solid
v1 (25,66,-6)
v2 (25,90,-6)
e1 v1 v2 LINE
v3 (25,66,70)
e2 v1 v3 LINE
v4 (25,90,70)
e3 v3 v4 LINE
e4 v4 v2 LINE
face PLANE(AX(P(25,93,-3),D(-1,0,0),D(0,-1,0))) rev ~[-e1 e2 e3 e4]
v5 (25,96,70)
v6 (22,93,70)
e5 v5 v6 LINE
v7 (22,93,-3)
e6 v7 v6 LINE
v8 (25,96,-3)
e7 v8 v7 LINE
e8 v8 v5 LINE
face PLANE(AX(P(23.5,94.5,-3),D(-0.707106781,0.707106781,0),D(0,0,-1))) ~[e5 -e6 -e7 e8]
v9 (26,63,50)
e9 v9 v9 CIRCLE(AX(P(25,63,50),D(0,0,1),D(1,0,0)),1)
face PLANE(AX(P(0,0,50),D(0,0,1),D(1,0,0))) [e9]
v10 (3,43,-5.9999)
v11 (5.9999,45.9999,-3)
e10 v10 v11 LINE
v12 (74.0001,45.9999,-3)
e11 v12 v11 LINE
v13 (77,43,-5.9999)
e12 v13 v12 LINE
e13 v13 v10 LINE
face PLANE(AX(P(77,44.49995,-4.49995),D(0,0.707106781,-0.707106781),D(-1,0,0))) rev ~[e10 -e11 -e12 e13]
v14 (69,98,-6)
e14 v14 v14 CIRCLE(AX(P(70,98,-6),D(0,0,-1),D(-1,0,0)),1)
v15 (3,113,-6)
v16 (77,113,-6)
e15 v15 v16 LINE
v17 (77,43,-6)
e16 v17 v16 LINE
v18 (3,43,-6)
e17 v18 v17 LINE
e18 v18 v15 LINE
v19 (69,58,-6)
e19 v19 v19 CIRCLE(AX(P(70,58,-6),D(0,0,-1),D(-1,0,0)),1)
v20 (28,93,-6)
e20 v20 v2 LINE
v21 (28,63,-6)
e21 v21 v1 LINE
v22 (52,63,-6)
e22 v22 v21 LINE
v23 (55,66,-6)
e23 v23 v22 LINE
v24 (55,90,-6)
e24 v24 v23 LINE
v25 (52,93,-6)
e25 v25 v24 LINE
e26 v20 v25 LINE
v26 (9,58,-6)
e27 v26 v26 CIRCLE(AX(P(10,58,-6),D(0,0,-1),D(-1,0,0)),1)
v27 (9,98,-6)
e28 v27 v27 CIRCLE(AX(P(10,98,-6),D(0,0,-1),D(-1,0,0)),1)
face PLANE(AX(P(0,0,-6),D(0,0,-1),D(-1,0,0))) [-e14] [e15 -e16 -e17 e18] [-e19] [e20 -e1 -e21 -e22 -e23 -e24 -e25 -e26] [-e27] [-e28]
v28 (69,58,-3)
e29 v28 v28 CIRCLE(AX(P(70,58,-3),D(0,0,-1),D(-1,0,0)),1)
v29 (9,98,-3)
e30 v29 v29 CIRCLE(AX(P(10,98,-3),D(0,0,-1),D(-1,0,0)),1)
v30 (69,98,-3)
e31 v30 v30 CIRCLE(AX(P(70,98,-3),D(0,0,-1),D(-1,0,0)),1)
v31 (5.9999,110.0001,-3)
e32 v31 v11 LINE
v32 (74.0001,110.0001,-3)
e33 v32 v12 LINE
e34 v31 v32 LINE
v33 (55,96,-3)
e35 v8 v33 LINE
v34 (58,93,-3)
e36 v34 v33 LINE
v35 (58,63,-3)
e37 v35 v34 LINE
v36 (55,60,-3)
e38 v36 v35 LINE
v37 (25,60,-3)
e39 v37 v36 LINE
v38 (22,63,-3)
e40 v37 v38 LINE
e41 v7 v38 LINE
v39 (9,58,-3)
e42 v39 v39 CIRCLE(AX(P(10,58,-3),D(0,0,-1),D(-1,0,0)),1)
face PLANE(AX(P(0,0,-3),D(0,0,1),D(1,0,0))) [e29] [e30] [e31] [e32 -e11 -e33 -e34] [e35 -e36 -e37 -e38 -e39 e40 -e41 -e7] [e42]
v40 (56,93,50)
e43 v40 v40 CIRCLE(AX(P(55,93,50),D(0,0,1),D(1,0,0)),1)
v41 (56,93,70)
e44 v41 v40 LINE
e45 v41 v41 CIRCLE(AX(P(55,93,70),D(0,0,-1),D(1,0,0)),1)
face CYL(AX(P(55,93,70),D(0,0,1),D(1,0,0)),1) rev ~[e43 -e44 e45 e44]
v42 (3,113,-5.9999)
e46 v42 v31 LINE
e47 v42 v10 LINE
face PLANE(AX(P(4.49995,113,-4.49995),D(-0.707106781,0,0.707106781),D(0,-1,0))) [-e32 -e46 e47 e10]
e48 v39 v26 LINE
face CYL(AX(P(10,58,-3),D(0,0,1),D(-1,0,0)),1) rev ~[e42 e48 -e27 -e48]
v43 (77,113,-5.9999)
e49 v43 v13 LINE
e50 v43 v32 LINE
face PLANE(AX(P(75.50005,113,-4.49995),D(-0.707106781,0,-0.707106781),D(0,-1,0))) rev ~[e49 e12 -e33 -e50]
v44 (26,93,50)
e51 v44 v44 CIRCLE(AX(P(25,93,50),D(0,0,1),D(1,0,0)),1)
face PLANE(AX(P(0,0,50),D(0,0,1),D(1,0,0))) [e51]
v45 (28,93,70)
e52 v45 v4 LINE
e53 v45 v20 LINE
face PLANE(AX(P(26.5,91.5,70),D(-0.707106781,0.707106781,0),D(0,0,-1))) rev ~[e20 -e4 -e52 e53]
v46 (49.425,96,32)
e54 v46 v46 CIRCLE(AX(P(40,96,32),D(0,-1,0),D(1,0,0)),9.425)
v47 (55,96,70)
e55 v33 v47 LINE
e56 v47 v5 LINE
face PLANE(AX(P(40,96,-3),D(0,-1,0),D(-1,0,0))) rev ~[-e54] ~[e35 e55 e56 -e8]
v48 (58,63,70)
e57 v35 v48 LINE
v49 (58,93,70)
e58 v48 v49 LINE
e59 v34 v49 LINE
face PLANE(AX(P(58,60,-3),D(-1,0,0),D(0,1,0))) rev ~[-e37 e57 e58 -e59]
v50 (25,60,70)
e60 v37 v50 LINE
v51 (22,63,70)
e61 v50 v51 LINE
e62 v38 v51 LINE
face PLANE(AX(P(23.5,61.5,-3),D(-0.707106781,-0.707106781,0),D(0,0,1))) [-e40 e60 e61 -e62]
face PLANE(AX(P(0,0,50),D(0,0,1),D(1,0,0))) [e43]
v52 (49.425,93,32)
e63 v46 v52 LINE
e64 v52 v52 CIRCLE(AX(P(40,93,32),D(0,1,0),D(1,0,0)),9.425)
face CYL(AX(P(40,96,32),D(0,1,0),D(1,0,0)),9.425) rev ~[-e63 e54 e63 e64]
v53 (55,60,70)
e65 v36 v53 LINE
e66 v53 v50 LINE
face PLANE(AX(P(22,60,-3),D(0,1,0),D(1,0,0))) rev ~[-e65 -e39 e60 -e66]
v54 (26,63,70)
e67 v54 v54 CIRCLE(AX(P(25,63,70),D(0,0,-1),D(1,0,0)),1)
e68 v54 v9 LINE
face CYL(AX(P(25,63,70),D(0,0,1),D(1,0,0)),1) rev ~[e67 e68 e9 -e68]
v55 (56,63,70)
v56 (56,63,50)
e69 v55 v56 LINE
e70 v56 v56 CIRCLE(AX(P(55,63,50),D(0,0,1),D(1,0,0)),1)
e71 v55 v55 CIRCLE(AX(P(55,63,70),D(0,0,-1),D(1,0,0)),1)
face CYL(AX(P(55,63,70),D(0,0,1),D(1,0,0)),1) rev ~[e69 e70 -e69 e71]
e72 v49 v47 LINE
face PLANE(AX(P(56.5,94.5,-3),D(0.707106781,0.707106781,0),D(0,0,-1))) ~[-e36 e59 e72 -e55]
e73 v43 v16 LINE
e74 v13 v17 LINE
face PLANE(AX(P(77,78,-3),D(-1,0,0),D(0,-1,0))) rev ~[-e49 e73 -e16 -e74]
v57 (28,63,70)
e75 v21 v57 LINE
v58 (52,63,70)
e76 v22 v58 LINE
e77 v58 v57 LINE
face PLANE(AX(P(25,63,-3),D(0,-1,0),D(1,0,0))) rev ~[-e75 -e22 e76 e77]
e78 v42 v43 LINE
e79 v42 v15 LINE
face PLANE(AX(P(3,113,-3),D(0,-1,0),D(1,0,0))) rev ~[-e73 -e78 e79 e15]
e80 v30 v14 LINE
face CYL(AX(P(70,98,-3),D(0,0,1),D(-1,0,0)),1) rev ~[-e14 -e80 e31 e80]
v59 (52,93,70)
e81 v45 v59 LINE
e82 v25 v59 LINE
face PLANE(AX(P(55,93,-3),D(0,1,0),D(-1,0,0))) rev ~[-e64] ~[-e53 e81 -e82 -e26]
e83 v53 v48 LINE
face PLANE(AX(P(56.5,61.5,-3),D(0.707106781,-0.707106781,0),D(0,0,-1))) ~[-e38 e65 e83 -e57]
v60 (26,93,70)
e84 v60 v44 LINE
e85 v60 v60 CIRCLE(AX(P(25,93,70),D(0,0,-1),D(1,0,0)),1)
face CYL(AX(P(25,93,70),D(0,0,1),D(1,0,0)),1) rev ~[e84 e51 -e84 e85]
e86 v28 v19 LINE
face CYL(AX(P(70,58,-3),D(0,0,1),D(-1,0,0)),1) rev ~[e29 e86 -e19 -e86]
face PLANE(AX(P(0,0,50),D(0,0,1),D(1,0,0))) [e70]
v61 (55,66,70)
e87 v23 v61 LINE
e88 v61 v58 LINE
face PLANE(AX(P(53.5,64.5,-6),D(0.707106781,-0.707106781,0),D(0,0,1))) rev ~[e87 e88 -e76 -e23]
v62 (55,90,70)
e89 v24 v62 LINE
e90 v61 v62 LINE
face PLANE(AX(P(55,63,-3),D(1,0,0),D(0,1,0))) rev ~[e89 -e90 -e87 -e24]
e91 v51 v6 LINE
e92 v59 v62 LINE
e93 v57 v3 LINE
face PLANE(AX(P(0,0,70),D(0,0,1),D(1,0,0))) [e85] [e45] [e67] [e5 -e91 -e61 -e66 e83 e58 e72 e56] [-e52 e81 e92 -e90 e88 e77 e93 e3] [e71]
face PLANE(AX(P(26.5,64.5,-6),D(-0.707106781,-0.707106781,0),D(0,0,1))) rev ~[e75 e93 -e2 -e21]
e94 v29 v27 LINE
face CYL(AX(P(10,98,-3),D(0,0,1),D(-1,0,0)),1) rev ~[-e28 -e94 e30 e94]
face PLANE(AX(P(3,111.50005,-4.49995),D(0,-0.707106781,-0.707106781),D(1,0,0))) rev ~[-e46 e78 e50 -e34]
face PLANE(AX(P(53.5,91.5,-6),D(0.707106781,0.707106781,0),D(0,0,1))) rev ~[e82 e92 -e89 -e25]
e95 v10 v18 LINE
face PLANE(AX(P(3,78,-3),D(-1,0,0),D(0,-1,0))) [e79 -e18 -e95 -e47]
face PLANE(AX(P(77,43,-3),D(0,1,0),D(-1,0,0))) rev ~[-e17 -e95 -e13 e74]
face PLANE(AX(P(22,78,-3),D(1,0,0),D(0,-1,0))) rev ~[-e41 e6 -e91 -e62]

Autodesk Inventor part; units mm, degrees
ref_plane "YZ Plane" through (0, 0, 0) normal (1, 0, 0) x (0, 1, 0)
ref_plane "XZ Plane" through (0, 0, 0) normal (0, 1, 0) x (-1, 0, 0)
ref_plane "XY Plane" through (0, 0, 0) normal (0, 0, 1) x (1, 0, 0)
sketch "Sketch1" plane through (0, 0, 0) normal (0, 0, 1) x (1, 0, 0)
  line L0 (0, 0) -> (80, 0)
  line L1 (80, 0) -> (80, 125.359)
  line L2 (60, 200) -> (80, 125.359)
  line L3 (60, 200) -> (137.2741, 200) construction
  line L4 (0, 0) -> (0, 125.359)
  line L5 (20, 200) -> (0, 125.359)
  line L6 (84, 125.8856) -> (84, -4)
  line L7 (84, -4) -> (-4, -4)
  line L8 (-4, -4) -> (-4, 125.8856)
  line L9 (-4, 125.8856) -> (16.9307, 204)
  line L10 (63.0693, 204) -> (84, 125.8856)
  line L11 (20, 204) -> (20, 200)
  line L12 (60, 200) -> (60, 204)
  line L13 (16.9307, 204) -> (20, 204)
  line L14 (60, 204) -> (63.0693, 204)
  point P0 (40, 0)
  dimension "d0" = 80
  dimension "d4" = 75
  dimension "d5" = 4
extrude "Extrusion1" add sketch "Sketch1" along normal blind 70
sketch "Sketch2" plane through (0, 0, 0) normal (0, 0, -1) x (-1, 0, 0)
  line L0 (-16.9307, 204) -> (4, 125.8856) projected
  line L1 (-84, 125.8856) -> (-63.0693, 204) projected
  line L2 (-16.9307, 204) -> (-63.0693, 204)
  line L3 (-80, 125.359) -> (-80, 0) projected
  line L4 (-60, 200) -> (-80, 125.359) projected
  line L5 (-60, 204) -> (-60, 200) projected
  line L6 (-63.0693, 204) -> (-60, 204) projected
  line L7 (-84, 125.8856) -> (-63.0693, 204) projected
  line L8 (-84, -4) -> (-84, 125.8856) projected
  line L9 (4, -4) -> (-84, -4) projected
  line L10 (4, 125.8856) -> (4, -4) projected
  line L11 (-16.9307, 204) -> (4, 125.8856) projected
  line L12 (-20, 204) -> (-16.9307, 204) projected
  line L13 (-20, 200) -> (-20, 204) projected
  line L14 (0, 125.359) -> (-20, 200) projected
  line L15 (0, 0) -> (0, 125.359) projected
  line L16 (-80, 0) -> (0, 0) projected
extrude "Extrusion2" add sketch "Sketch2" along normal blind 3
chamfer "Chamfer1" distance 5 angle 45 5 edges at (40, -4, -3) (84, 60.9428, -3) (-4, 60.9428, -3) (6.4653, 164.9428, -3) (73.5347, 164.9428, -3)
chamfer "Chamfer2" distance 3 angle 45 7 edges at (20, 202, 0) (10, 162.6795, 0) (60, 202, 0) (70, 162.6795, 0) (80, 62.6795, 0) (0, 62.6795, 0) (40, 0, 0)
chamfer "Chamfer3" distance 3 angle 45 4 edges at (84, -4, 36) (-4, -4, 36) (0, 0, 36.5) (80, 0, 36.5)
sketch "Sketch3" plane through (0, 0, 70) normal (0, 0, 1) x (1, 0, 0)
  line L0 (77, 0) -> (78.5, 1.5) projected
  line L1 (81, -4) -> (82.5, -2.5) projected
  line L2 (78.5, 1.5) -> (82.5, -2.5)
  line L3 (79, 1) -> (82.5, -2.5) projected
  circle A0 centre (80.75, -0.75) radius 1
  line L4 (-4, -1) -> (-2.5, -2.5) projected
  line L5 (-2.5, -2.5) -> (1.5, 1.5)
  line L6 (0, 3) -> (3, 0) projected
  line L7 (1, 1) -> (-2.5, -2.5) projected
  circle A1 centre (-0.75, -0.75) radius 1
  line L8 (3, 124.964) -> (0, 125.359) projected
  line L9 (16.9307, 204) -> (-4, 125.8856) projected
  line L10 (80, 125.359) -> (77, 124.964) projected
  line L11 (84, -1) -> (84, 125.8856) projected
  line L12 (1, 125.2273) -> (-4, 125.8856) projected
  circle A2 centre (82, 125.6223) radius 1
  circle A3 centre (-2, 125.6223) radius 1
  point P0 (0, 0)
  dimension "d19" = 2
  dimension "d20" = 2
  dimension "d22" = 2
  dimension "d23" = 2
extrude "Extrusion3" cut sketch "Sketch3" against normal blind 5
sketch "Sketch4" plane through (22.1071, 204, -3) normal (0, 1, 0) x (1, 0, 0)
  line L0 (35.7859, 0) -> (40.9622, -5) projected
  line L1 (38.374, -2.5) -> (36.3929, -4.5)
  line L2 (34.8929, -3) -> (37.8929, -6) projected
  circle A0 centre (37.3835, -3.5) radius 1
  line L3 (-21.1071, 0) -> (56.8929, 0) projected
  line L4 (17.8929, 0) -> (17.8929, -26)
  circle A1 centre (-1.5976, -3.5) radius 1
  point P0 (-22.1071, -3)
  dimension "d26" = 2
extrude "Extrusion4" cut sketch "Sketch4" against normal blind 15
sketch "Sketch5" plane through (0, 0, 0) normal (0, 0, 1) x (1, 0, 0)
  line L0 (77, 3) -> (3, 3) projected
  line L1 (40, 3) -> (40, 43)
  line L2 (40, 43) -> (40, 113)
  line L3 (40, 78) -> (20, 78)
  line L4 (20, 78) -> (20, 55.5)
  line L5 (20, 55.5) -> (60, 55.5)
  line L6 (60, 55.5) -> (60, 100.5)
  line L7 (60, 100.5) -> (20, 100.5)
  line L8 (20, 100.5) -> (20, 78)
  line L9 (40, 78) -> (70, 78)
  line L10 (70, 78) -> (70, 98)
  circle A0 centre (70, 98) radius 1
  line L11 (70, 78) -> (70, 58)
  circle A1 centre (70, 58) radius 1
  circle A2 centre (10, 98) radius 1
  circle A3 centre (10, 58) radius 1
  line L12 (40, 113) -> (40, 133)
  line L13 (40, 133) -> (63.1521, 133)
  line L14 (63.1521, 133) -> (63.1521, 155.7076)
  circle A4 centre (63.1521, 155.7076) radius 1.5
  circle A5 centre (63.1521, 133) radius 1.5
  circle A6 centre (16.8479, 155.7076) radius 1.5
  circle A7 centre (16.8479, 133) radius 1.5
  point P0 (0, 0)
  dimension "d29" = 40
  dimension "d30" = 70
  dimension "d31" = 20
  dimension "d32" = 22.5
  dimension "d33" = 40
  dimension "d34" = 45
  dimension "d35" = 30
  dimension "d36" = 20
  dimension "d37" = 2
  dimension "d38" = 20
  dimension "d39" = 2
  dimension "d40" = 20
  dimension "d41" = 23.1521
  dimension "d42" = 22.7076
  dimension "d43" = 3
  dimension "d44" = 3
extrude "Extrusion5" cut sketch "Sketch5" against normal blind 40
sketch "Sketch7" plane through (-1, -4, 2) normal (0, -1, 0) x (1, 0, 0)
  line L0 (78, 68) -> (4, 68) projected
  line L1 (41, 68) -> (41, 34)
  line L2 (54.7, 34) -> (27.3, 34)
  line L3 (54.7, 34) -> (54.7, 20.8)
  line L4 (54.7, 20.8) -> (27.3, 20.8)
  line L5 (27.3, 34) -> (27.3, 20.8)
  point P0 (1, -2)
  dimension "d47" = 27.4
  dimension "d48" = 34
  dimension "d49" = 13.2
extrude "Extrusion6" cut sketch "Sketch7" against normal blind 27.4
sketch "Sketch8" plane through (-4, 125.8856, 2) normal (-0.9659258, 0.258819, 0) x (0, 0, 1)
  line L0 (-2, 13.7678) -> (-2, 10.7678) projected
  line L1 (-2, 35.7017) -> (-2, 32.7017) projected
  line L2 (3.9828, 34.5121) -> (3.9828, 12.5782)
  line L3 (3.9828, 23.5451) -> (5.9828, 23.5451)
  line L4 (5.9828, 23.5451) -> (12.9828, 23.5451)
  line L5 (12.9828, 23.5451) -> (12.9828, 30.2951)
  line L6 (12.9828, 30.2951) -> (12.9828, 16.7951)
  line L7 (12.9828, 16.7951) -> (5.9828, 16.7951)
  line L8 (5.9828, 16.7951) -> (5.9828, 29.9848)
  line L9 (5.9828, 29.9848) -> (12.9828, 30.2951)
  point P0 (-2, -120.5609)
  point P1 (12.9828, 30.2951)
  dimension "d52" = 2
  dimension "d53" = 7
  dimension "d54" = 6.75
  dimension "d55" = 13.5
extrude "Extrusion7" cut sketch "Sketch8" against normal blind 9
chamfer "Chamfer4" distance 1 angle 45 4 edges at (5.7728, 154.6308, 14.9828) (2.2788, 141.5908, 14.9828) (2.2788, 141.5908, 7.9828) (5.6925, 154.331, 7.9828)
sketch "Sketch9" plane through (-4, 125.8856, 2) normal (-1, 0, 0) x (0, 0, 1)
  line L0 (1, -0.5266) -> (1, -122.8856) projected
  line L1 (1, -48.8247) -> (7.6436, -48.8247)
  line L2 (7.6436, -48.8247) -> (7.6436, -34.3247)
  line L3 (7.6436, -34.3247) -> (7.6436, -63.3247)
  circle A0 centre (7.6436, -34.3247) radius 2
  circle A1 centre (7.6436, -63.3247) radius 2
  point P0 (-2, -125.8856)
  dimension "d61" = 14.5
  dimension "d62" = 29
  dimension "d63" = 4
  dimension "d64" = 4
extrude "Extrusion8" cut sketch "Sketch9" against normal blind 999
sketch "Sketch17" plane through (0, 0, -3) normal (0, 0, -1) x (-1, 0, 0)
  line L0 (-60, 55.5) -> (-60, 100.5) projected
  line L1 (-60, 78) -> (-77, 78)
  line L2 (-77, 124.964) -> (-77, 3) projected
  line L3 (-77, 78) -> (-77, 43)
  line L4 (-77, 78) -> (-77, 113)
  line L5 (-60, 55.5) -> (-20, 55.5) projected
  line L6 (-40, 55.5) -> (-40, 37.7198)
  line L7 (-20, 55.5) -> (-20, 100.5)
  line L8 (-20, 78) -> (-3, 78)
  line L9 (-3, 78) -> (-3, 43)
  line L10 (-3, 78) -> (-3, 113)
  line L11 (-20, 55.5) -> (-60, 55.5)
  line L12 (-77, 43) -> (-3, 43)
  line L13 (-3, 3) -> (-3, 124.964) projected
  line L14 (-3, 113) -> (-77, 113)
  line L15 (-79, 1) -> (-79, 125.2273) projected
  circle A0 centre (-63.1521, 133) radius 1.5 projected
  circle A1 centre (-70, 98) radius 1 projected
  circle A2 centre (-10, 58) radius 1 projected
  circle A3 centre (-16.8479, 133) radius 1.5 projected
  circle A4 centre (-63.1521, 155.7076) radius 1.5 projected
  circle A5 centre (-70, 58) radius 1 projected
  circle A6 centre (-10, 98) radius 1 projected
  circle A7 centre (-16.8479, 155.7076) radius 1.5 projected
  line L16 (-20, 55.5) -> (-60, 55.5) projected
  line L17 (-60, 55.5) -> (-60, 100.5) projected
  line L18 (-60, 100.5) -> (-20, 100.5) projected
  line L19 (-20, 100.5) -> (-20, 55.5) projected
  line L20 (-79, 125.2273) -> (-57.8929, 204) projected
  line L21 (-79, 1) -> (-79, 125.2273) projected
  line L22 (-1, 1) -> (-79, 1) projected
  line L23 (-1, 125.2273) -> (-1, 1) projected
  line L24 (-22.1071, 204) -> (-1, 125.2273) projected
  line L25 (-22.1071, 204) -> (-57.8929, 204) projected
  point P0 (0, 0)
  dimension "d106" = 35
  dimension "d107" = 35
extrude "Extrusion16" add sketch "Sketch17" along normal blind 3 contours L5 L6 L12 L2 L1 L0 | L0 L18 L7 L5 | L1 L2 L14 L10 L8 L7 L18 L0 | L5 L7 L8 L9 L12 L6
sketch "Sketch18" plane through (0, 0, 70) normal (0, 0, 1) x (1, 0, 0)
  line L0 (-145.0841, -156.9657) -> (0, 339.906)
  line L1 (0, 339.906) -> (209.9789, 212.1699)
  line L2 (209.9789, 212.1699) -> (104.9894, -207.8436)
  line L3 (104.9894, -207.8436) -> (-145.0841, -156.9657)
  point P0 (0, 0)
extrude "Extrusion17" cut sketch "Sketch18" against normal blind 73
sketch "Sketch19" plane through (0, 0, -3) normal (0, 0, 1) x (1, 0, 0)
  line L0 (3, 113) -> (77, 113) projected
  line L1 (77, 43) -> (3, 43) projected
  line L2 (40, 43) -> (40, 113)
  line L3 (40, 78) -> (25, 78)
  line L4 (25, 78) -> (25, 63)
  line L5 (25, 63) -> (40, 63)
  line L6 (40, 63) -> (55, 63)
  line L7 (55, 63) -> (55, 93)
  line L8 (55, 93) -> (25, 93)
  line L9 (25, 93) -> (25, 78)
  line L10 (22, 78) -> (22, 60)
  line L11 (22, 60) -> (40, 60)
  line L12 (40, 60) -> (58, 60)
  line L13 (58, 60) -> (58, 96)
  line L14 (58, 96) -> (22, 96)
  line L15 (22, 96) -> (22, 78)
  point P0 (0, 0)
  dimension "d112" = 15
  dimension "d113" = 15
  dimension "d114" = 15
  dimension "d115" = 15
  dimension "d116" = 30
  dimension "d117" = 3
extrude "Extrusion18" add sketch "Sketch19" along normal blind 73 contours L11 L10 L15 L14 L2 L8 L9 L4 L5 | L2 L6 L7 L8 L14 L13 L12
sketch "Sketch20" plane through (0, 0, -3) normal (0, 0, 1) x (1, 0, 0)
  line L0 (25, 93) -> (25, 63) projected
  line L1 (25, 63) -> (55, 63) projected
  line L2 (55, 63) -> (55, 93) projected
  line L3 (55, 93) -> (25, 93) projected
  point P0 (0, 0)
extrude "Extrusion19" cut sketch "Sketch20" against normal blind 73
chamfer "Chamfer7" distance 3 angle 45 8 edges at (58, 60, 33.5) (25, 93, 32) (58, 96, 33.5) (55, 63, 32) (22, 96, 33.5) (55, 93, 32) (25, 63, 32) (22, 60, 33.5)
chamfer "Chamfer8" distance 3 angle 45 4 edges at (3, 78, -3) (40, 43, -3) (77, 78, -3) (40, 113, -3)
sketch "Sketch21" plane through (25, 96, -3) normal (0, 1, 0) x (1, 0, 0)
  line L0 (0, -73) -> (0, 0) projected
  line L1 (30, -73) -> (0, -73) projected
  line L2 (30, 0) -> (30, -73) projected
  line L3 (0, 0) -> (30, 0) projected
  line L4 (0, -73) -> (0, 3) projected
  line L5 (0, -35) -> (30, -35)
  line L6 (30, -73) -> (30, 0) projected
  circle A0 centre (15, -35) radius 9.425
  point P0 (-25, -3)
  dimension "d128" = 18.85
extrude "Extrusion20" cut sketch "Sketch21" against normal blind 3 contours A0 L5 | L5 A0
sketch "Sketch22" plane through (0, 0, 70) normal (0, 0, 1) x (1, 0, 0)
  line L0 (25, 60) -> (22, 63) projected
  line L1 (25, 60) -> (55, 60) projected
  line L2 (58, 63) -> (55, 60) projected
  line L3 (58, 63) -> (58, 93) projected
  line L4 (55, 96) -> (58, 93) projected
  line L5 (55, 96) -> (25, 96) projected
  line L6 (22, 93) -> (25, 96) projected
  line L7 (22, 93) -> (22, 63) projected
  line L8 (28, 93) -> (52, 93) projected
  line L9 (55, 90) -> (52, 93) projected
  line L10 (55, 90) -> (55, 66) projected
  line L11 (52, 63) -> (55, 66) projected
  line L12 (52, 63) -> (28, 63) projected
  line L13 (25, 66) -> (28, 63) projected
  line L14 (25, 66) -> (25, 90) projected
  line L15 (28, 93) -> (25, 90) projected
  line L16 (25, 90) -> (28, 93) projected
  line L17 (26.5, 91.5) -> (23.5, 94.5)
  line L18 (22, 93) -> (25, 96) projected
  line L19 (25, 60) -> (22, 63) projected
  line L20 (23.5, 61.5) -> (26.5, 64.5)
  line L21 (28, 63) -> (25, 66) projected
  line L22 (56.5, 61.5) -> (53.5, 64.5)
  line L23 (53.5, 91.5) -> (56.5, 94.5)
  line L24 (58, 93) -> (55, 96) projected
  circle A0 centre (25, 63) radius 1
  circle A1 centre (55, 63) radius 1
  circle A2 centre (55, 93) radius 1
  circle A3 centre (25, 93) radius 1
  point P0 (0, 0)
  dimension "d131" = 2
  dimension "d132" = 2
  dimension "d133" = 2
  dimension "d134" = 2
extrude "Extrusion21" cut sketch "Sketch22" against normal blind 20 contours A0 L20 | L20 A0 | A1 L22 | L22 A1 | A3 L17 | L17 A3 | A2 L23 | L23 A2
equation "\"d45\" = d33"
equation "\"d50\" = d47"
properties part number "the handle"
